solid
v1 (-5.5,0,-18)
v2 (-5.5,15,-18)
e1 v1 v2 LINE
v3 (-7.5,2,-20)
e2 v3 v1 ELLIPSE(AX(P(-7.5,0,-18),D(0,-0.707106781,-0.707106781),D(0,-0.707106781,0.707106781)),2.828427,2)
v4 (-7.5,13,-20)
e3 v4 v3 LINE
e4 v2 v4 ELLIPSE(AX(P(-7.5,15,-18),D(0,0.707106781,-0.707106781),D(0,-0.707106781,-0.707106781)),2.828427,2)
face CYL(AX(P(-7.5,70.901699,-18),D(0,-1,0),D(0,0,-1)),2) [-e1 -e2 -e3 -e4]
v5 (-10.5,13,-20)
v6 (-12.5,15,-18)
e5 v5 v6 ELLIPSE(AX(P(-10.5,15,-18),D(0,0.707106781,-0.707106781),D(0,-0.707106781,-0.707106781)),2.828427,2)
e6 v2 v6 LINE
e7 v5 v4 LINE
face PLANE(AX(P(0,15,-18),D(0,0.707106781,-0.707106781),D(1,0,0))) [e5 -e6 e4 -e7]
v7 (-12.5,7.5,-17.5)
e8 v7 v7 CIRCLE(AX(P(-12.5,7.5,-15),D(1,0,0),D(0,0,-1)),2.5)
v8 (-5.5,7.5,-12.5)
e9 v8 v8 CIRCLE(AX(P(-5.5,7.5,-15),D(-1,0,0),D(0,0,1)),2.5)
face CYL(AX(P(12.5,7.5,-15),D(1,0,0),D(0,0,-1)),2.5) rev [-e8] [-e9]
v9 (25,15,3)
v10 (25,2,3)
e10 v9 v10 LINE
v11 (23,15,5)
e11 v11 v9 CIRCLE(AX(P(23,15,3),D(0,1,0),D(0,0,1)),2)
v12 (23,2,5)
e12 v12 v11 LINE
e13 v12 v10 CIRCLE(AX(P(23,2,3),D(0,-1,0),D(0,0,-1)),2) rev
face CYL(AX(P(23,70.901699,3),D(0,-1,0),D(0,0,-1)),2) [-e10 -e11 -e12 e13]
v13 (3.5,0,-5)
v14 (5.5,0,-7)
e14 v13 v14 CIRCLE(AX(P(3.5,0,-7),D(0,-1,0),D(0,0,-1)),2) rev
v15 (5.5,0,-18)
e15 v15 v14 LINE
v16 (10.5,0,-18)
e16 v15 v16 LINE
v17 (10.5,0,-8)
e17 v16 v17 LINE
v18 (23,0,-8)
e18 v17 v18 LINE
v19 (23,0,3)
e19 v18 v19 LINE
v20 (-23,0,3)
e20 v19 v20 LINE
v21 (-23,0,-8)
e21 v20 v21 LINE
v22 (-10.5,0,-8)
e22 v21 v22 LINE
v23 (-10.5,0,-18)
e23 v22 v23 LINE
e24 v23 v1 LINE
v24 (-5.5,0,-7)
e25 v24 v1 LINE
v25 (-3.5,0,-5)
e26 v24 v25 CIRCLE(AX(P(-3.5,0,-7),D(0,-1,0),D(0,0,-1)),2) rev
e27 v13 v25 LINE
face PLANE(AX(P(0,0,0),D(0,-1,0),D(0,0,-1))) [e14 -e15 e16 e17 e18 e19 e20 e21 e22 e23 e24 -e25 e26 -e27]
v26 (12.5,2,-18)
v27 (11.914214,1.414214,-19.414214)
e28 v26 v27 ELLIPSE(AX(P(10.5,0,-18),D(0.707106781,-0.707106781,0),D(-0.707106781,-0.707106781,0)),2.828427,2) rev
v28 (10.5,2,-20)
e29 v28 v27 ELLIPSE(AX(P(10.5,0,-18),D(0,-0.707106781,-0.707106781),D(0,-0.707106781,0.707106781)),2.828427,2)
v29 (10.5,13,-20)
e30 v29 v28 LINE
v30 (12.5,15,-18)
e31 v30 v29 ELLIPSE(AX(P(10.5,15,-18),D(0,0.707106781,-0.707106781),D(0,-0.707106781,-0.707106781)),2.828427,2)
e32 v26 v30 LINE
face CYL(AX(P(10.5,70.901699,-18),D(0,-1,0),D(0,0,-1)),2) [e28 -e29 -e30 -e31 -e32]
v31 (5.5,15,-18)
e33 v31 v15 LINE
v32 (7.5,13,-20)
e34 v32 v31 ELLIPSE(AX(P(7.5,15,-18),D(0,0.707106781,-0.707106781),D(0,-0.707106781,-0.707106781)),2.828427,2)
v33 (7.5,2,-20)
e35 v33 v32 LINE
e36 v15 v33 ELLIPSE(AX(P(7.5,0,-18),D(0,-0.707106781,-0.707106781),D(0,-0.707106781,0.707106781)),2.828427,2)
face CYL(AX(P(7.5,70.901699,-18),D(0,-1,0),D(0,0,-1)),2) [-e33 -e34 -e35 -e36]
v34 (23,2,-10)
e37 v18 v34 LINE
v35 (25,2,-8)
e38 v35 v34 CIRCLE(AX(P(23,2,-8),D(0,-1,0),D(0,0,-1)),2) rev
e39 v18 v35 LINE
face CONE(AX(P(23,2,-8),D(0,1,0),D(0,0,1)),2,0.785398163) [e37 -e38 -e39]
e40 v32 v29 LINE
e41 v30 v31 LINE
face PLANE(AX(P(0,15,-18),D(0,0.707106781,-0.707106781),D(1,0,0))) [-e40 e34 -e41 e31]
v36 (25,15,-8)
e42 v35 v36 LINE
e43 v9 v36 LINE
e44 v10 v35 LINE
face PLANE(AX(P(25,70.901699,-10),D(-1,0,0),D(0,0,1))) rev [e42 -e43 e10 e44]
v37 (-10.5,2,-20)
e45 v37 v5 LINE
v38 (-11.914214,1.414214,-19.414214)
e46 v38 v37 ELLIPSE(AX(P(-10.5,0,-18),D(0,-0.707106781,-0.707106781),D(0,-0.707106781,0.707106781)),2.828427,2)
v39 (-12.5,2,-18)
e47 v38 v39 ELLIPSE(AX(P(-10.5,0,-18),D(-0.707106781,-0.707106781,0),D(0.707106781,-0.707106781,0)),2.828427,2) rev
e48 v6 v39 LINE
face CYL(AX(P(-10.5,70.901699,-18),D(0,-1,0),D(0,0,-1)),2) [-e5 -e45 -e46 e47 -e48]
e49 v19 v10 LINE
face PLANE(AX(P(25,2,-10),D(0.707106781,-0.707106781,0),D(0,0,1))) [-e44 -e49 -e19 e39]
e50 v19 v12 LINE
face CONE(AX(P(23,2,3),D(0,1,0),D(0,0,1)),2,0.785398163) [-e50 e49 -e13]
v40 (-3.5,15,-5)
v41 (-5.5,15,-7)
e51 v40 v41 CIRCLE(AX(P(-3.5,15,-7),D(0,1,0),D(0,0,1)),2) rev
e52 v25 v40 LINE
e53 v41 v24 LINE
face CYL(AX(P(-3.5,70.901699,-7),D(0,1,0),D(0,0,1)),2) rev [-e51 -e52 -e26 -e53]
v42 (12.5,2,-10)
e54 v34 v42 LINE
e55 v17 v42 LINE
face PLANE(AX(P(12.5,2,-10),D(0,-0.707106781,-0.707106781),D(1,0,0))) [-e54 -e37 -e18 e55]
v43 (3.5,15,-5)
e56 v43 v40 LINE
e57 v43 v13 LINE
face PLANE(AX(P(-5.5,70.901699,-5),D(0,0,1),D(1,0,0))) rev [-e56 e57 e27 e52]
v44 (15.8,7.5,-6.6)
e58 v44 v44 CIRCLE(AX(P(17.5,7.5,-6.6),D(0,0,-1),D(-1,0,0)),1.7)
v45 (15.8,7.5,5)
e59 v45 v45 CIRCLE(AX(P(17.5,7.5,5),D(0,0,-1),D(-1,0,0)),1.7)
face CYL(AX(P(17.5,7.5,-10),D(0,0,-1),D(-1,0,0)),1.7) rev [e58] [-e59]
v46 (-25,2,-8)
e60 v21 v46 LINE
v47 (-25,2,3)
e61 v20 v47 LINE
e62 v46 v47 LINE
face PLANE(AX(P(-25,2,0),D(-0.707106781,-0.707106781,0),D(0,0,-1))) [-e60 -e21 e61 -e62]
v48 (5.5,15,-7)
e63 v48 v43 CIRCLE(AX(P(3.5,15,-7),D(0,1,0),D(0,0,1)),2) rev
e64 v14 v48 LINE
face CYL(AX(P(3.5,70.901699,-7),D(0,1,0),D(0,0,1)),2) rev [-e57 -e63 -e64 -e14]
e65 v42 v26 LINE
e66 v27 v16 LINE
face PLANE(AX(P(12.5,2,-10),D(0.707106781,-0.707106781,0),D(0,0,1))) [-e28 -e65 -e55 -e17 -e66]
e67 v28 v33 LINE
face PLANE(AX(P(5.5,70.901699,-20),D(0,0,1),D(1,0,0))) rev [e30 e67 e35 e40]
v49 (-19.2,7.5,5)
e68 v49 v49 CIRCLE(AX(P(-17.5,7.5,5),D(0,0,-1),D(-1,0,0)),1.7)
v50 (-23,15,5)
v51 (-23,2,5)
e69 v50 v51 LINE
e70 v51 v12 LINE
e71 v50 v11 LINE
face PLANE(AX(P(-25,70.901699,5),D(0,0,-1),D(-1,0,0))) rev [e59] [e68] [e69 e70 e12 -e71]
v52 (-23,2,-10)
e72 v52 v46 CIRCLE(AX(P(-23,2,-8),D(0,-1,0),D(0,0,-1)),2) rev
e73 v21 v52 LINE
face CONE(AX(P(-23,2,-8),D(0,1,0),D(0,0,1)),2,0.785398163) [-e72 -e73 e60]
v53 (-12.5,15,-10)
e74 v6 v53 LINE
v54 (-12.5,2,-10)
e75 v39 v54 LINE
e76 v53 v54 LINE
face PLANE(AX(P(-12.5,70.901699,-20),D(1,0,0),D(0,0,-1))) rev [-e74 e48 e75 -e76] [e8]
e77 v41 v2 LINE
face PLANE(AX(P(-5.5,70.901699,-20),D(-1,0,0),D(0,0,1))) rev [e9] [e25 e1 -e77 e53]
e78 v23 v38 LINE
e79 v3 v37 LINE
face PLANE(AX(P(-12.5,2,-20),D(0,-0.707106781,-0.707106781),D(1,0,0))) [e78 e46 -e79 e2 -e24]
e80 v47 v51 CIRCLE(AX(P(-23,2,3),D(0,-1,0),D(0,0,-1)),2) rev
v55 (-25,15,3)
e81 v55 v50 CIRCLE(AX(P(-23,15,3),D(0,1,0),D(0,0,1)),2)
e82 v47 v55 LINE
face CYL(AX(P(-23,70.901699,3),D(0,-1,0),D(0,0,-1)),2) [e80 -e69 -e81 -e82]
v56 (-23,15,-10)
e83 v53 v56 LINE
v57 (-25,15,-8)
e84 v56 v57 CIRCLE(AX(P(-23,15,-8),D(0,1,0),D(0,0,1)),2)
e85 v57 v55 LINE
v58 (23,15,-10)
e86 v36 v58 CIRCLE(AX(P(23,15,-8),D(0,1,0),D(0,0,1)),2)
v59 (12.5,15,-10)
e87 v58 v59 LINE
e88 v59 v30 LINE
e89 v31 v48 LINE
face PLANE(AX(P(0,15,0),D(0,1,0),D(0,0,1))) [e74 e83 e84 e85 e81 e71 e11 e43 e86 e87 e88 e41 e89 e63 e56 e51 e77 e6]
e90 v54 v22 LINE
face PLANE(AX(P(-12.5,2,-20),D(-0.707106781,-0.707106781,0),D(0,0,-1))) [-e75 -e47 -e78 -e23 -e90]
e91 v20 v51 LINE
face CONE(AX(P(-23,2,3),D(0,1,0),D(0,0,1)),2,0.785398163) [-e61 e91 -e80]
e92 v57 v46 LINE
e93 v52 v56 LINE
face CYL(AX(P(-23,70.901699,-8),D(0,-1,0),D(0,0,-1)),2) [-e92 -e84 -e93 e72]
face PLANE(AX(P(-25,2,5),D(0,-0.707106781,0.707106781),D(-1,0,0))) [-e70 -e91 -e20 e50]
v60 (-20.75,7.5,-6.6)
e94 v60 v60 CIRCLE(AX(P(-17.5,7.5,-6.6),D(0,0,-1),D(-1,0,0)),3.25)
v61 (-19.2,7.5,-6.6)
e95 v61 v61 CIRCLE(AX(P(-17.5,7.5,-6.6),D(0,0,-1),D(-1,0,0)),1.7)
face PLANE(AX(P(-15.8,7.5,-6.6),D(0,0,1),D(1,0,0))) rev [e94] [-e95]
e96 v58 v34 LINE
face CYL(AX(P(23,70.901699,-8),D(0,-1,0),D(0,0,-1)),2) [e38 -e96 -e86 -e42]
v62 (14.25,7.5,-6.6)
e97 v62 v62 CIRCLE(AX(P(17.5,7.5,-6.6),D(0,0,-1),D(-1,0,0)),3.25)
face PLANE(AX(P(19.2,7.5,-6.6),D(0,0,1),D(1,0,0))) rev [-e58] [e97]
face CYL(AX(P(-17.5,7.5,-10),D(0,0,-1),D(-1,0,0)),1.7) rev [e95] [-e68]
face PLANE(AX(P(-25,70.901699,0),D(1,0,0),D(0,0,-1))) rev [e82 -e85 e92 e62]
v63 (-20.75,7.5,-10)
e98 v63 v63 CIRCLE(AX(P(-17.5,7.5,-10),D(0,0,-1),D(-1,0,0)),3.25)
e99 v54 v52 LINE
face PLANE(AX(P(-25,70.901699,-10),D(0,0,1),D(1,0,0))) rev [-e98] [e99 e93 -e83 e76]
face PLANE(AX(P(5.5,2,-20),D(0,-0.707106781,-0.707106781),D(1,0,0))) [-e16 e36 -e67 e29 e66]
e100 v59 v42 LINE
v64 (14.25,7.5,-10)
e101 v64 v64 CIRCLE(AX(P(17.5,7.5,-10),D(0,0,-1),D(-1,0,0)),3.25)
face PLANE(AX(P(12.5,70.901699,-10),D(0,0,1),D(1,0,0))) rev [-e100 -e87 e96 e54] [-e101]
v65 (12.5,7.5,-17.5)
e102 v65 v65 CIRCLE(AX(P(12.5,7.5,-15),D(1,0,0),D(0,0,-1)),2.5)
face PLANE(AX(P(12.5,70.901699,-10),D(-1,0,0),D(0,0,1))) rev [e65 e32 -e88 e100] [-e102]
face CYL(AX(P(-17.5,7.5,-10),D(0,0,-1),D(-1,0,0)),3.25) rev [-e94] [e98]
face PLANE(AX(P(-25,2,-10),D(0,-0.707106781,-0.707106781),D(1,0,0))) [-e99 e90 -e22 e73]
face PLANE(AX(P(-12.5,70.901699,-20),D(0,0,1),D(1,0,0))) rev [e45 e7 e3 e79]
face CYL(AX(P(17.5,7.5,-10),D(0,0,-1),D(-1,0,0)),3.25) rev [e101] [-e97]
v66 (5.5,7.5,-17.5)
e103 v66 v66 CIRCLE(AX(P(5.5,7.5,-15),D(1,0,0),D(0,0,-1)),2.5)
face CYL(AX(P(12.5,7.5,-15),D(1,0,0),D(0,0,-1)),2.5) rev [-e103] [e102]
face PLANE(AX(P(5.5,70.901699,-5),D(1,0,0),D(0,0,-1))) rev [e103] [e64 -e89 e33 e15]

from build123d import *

# Parameters (mm, degrees)
MAIN_BLOCK_DEPTH                = 15
TENSION_SCREW_HOLES_D           = 3.4
TENSION_SCREW_HOLES_CBORE_D     = 6.5
TENSION_SCREW_HOLES_CBORE_DEPTH = 3.4
IDLER_MOUNTING_HOLE_D           = 5
COSMETIC_CHAMFER_SIZE           = 2
PRINT_HELPER_FILLETS_R          = 2
COSMETIC_CHAMFERS_SIZE          = 2


with BuildPart() as part:
    # Main Body Sketch → Main Block (new body)
    with BuildSketch(Plane(origin=(0, 0, 0), x_dir=(1, 0, 0), z_dir=(0, 1, 0))):
        Polygon((-12.5, 20), (-12.5, 10), (-25, 10), (-25, 0), (-25, -5), (25, -5), (25, 10), (12.5, 10), (12.5, 20), (5.5, 20), (5.5, 5), (-5.5, 5), (-5.5, 20), align=None)
    extrude(amount=MAIN_BLOCK_DEPTH)

    # Tension Screw Holes (through all)
    with Locations(Plane(origin=(0, 0, -10), x_dir=(-1, 0, 0), z_dir=(0, 0, -1))):
        with Locations((17.5, 7.5), (-17.5, 7.5)):
            CounterBoreHole(TENSION_SCREW_HOLES_D / 2, TENSION_SCREW_HOLES_CBORE_D / 2, TENSION_SCREW_HOLES_CBORE_DEPTH)

    # Idler Mounting Hole (through all)
    with Locations(Plane(origin=(12.5, 0, 0), x_dir=(0, 0, -1), z_dir=(1, 0, 0))):
        with Locations((15, 7.5)):
            Hole(IDLER_MOUNTING_HOLE_D / 2)

    # Cosmetic Chamfer
    cosmetic_chamfer_edges = [part.edges().sort_by_distance(p)[0] for p in [
        (9, 0, -20),
        (-9, 0, -20),
        (9, 15, -20),
        (-9, 15, -20),
    ]]
    chamfer(cosmetic_chamfer_edges, length=COSMETIC_CHAMFER_SIZE)

    # Print Helper Fillets
    print_helper_fillets_edges = [part.edges().sort_by_distance(p)[0] for p in [
        (-5.5, 7.5, -5),
        (5.5, 7.5, -5),
        (-12.5, 7.5, -20),
        (-5.5, 7.5, -20),
        (5.5, 7.5, -20),
        (12.5, 7.5, -20),
        (-25, 7.5, 5),
        (25, 7.5, -10),
        (25, 7.5, 5),
        (-25, 7.5, -10),
    ]]
    fillet(print_helper_fillets_edges, radius=PRINT_HELPER_FILLETS_R)

    # Cosmetic Chamfers
    cosmetic_chamfers_edges = [part.edges().sort_by_distance(p)[0] for p in [
        (-17.75, 0, -10),
        (-24.414213562, 0, -9.414213562),
        (-25, 0, -2.5),
        (-24.414213562, 0, 4.414213562),
        (0, 0, 5),
        (17.75, 0, -10),
        (24.414213562, 0, 4.414213562),
        (24.414213562, 0, -9.414213562),
        (25, 0, -2.5),
        (-12.5, 0, -14),
        (12.5, 0, -14),
    ]]
    chamfer(cosmetic_chamfers_edges, length=COSMETIC_CHAMFERS_SIZE - 0.0001)  # a hair under: the kernel refuses the full size


solid = part.part
